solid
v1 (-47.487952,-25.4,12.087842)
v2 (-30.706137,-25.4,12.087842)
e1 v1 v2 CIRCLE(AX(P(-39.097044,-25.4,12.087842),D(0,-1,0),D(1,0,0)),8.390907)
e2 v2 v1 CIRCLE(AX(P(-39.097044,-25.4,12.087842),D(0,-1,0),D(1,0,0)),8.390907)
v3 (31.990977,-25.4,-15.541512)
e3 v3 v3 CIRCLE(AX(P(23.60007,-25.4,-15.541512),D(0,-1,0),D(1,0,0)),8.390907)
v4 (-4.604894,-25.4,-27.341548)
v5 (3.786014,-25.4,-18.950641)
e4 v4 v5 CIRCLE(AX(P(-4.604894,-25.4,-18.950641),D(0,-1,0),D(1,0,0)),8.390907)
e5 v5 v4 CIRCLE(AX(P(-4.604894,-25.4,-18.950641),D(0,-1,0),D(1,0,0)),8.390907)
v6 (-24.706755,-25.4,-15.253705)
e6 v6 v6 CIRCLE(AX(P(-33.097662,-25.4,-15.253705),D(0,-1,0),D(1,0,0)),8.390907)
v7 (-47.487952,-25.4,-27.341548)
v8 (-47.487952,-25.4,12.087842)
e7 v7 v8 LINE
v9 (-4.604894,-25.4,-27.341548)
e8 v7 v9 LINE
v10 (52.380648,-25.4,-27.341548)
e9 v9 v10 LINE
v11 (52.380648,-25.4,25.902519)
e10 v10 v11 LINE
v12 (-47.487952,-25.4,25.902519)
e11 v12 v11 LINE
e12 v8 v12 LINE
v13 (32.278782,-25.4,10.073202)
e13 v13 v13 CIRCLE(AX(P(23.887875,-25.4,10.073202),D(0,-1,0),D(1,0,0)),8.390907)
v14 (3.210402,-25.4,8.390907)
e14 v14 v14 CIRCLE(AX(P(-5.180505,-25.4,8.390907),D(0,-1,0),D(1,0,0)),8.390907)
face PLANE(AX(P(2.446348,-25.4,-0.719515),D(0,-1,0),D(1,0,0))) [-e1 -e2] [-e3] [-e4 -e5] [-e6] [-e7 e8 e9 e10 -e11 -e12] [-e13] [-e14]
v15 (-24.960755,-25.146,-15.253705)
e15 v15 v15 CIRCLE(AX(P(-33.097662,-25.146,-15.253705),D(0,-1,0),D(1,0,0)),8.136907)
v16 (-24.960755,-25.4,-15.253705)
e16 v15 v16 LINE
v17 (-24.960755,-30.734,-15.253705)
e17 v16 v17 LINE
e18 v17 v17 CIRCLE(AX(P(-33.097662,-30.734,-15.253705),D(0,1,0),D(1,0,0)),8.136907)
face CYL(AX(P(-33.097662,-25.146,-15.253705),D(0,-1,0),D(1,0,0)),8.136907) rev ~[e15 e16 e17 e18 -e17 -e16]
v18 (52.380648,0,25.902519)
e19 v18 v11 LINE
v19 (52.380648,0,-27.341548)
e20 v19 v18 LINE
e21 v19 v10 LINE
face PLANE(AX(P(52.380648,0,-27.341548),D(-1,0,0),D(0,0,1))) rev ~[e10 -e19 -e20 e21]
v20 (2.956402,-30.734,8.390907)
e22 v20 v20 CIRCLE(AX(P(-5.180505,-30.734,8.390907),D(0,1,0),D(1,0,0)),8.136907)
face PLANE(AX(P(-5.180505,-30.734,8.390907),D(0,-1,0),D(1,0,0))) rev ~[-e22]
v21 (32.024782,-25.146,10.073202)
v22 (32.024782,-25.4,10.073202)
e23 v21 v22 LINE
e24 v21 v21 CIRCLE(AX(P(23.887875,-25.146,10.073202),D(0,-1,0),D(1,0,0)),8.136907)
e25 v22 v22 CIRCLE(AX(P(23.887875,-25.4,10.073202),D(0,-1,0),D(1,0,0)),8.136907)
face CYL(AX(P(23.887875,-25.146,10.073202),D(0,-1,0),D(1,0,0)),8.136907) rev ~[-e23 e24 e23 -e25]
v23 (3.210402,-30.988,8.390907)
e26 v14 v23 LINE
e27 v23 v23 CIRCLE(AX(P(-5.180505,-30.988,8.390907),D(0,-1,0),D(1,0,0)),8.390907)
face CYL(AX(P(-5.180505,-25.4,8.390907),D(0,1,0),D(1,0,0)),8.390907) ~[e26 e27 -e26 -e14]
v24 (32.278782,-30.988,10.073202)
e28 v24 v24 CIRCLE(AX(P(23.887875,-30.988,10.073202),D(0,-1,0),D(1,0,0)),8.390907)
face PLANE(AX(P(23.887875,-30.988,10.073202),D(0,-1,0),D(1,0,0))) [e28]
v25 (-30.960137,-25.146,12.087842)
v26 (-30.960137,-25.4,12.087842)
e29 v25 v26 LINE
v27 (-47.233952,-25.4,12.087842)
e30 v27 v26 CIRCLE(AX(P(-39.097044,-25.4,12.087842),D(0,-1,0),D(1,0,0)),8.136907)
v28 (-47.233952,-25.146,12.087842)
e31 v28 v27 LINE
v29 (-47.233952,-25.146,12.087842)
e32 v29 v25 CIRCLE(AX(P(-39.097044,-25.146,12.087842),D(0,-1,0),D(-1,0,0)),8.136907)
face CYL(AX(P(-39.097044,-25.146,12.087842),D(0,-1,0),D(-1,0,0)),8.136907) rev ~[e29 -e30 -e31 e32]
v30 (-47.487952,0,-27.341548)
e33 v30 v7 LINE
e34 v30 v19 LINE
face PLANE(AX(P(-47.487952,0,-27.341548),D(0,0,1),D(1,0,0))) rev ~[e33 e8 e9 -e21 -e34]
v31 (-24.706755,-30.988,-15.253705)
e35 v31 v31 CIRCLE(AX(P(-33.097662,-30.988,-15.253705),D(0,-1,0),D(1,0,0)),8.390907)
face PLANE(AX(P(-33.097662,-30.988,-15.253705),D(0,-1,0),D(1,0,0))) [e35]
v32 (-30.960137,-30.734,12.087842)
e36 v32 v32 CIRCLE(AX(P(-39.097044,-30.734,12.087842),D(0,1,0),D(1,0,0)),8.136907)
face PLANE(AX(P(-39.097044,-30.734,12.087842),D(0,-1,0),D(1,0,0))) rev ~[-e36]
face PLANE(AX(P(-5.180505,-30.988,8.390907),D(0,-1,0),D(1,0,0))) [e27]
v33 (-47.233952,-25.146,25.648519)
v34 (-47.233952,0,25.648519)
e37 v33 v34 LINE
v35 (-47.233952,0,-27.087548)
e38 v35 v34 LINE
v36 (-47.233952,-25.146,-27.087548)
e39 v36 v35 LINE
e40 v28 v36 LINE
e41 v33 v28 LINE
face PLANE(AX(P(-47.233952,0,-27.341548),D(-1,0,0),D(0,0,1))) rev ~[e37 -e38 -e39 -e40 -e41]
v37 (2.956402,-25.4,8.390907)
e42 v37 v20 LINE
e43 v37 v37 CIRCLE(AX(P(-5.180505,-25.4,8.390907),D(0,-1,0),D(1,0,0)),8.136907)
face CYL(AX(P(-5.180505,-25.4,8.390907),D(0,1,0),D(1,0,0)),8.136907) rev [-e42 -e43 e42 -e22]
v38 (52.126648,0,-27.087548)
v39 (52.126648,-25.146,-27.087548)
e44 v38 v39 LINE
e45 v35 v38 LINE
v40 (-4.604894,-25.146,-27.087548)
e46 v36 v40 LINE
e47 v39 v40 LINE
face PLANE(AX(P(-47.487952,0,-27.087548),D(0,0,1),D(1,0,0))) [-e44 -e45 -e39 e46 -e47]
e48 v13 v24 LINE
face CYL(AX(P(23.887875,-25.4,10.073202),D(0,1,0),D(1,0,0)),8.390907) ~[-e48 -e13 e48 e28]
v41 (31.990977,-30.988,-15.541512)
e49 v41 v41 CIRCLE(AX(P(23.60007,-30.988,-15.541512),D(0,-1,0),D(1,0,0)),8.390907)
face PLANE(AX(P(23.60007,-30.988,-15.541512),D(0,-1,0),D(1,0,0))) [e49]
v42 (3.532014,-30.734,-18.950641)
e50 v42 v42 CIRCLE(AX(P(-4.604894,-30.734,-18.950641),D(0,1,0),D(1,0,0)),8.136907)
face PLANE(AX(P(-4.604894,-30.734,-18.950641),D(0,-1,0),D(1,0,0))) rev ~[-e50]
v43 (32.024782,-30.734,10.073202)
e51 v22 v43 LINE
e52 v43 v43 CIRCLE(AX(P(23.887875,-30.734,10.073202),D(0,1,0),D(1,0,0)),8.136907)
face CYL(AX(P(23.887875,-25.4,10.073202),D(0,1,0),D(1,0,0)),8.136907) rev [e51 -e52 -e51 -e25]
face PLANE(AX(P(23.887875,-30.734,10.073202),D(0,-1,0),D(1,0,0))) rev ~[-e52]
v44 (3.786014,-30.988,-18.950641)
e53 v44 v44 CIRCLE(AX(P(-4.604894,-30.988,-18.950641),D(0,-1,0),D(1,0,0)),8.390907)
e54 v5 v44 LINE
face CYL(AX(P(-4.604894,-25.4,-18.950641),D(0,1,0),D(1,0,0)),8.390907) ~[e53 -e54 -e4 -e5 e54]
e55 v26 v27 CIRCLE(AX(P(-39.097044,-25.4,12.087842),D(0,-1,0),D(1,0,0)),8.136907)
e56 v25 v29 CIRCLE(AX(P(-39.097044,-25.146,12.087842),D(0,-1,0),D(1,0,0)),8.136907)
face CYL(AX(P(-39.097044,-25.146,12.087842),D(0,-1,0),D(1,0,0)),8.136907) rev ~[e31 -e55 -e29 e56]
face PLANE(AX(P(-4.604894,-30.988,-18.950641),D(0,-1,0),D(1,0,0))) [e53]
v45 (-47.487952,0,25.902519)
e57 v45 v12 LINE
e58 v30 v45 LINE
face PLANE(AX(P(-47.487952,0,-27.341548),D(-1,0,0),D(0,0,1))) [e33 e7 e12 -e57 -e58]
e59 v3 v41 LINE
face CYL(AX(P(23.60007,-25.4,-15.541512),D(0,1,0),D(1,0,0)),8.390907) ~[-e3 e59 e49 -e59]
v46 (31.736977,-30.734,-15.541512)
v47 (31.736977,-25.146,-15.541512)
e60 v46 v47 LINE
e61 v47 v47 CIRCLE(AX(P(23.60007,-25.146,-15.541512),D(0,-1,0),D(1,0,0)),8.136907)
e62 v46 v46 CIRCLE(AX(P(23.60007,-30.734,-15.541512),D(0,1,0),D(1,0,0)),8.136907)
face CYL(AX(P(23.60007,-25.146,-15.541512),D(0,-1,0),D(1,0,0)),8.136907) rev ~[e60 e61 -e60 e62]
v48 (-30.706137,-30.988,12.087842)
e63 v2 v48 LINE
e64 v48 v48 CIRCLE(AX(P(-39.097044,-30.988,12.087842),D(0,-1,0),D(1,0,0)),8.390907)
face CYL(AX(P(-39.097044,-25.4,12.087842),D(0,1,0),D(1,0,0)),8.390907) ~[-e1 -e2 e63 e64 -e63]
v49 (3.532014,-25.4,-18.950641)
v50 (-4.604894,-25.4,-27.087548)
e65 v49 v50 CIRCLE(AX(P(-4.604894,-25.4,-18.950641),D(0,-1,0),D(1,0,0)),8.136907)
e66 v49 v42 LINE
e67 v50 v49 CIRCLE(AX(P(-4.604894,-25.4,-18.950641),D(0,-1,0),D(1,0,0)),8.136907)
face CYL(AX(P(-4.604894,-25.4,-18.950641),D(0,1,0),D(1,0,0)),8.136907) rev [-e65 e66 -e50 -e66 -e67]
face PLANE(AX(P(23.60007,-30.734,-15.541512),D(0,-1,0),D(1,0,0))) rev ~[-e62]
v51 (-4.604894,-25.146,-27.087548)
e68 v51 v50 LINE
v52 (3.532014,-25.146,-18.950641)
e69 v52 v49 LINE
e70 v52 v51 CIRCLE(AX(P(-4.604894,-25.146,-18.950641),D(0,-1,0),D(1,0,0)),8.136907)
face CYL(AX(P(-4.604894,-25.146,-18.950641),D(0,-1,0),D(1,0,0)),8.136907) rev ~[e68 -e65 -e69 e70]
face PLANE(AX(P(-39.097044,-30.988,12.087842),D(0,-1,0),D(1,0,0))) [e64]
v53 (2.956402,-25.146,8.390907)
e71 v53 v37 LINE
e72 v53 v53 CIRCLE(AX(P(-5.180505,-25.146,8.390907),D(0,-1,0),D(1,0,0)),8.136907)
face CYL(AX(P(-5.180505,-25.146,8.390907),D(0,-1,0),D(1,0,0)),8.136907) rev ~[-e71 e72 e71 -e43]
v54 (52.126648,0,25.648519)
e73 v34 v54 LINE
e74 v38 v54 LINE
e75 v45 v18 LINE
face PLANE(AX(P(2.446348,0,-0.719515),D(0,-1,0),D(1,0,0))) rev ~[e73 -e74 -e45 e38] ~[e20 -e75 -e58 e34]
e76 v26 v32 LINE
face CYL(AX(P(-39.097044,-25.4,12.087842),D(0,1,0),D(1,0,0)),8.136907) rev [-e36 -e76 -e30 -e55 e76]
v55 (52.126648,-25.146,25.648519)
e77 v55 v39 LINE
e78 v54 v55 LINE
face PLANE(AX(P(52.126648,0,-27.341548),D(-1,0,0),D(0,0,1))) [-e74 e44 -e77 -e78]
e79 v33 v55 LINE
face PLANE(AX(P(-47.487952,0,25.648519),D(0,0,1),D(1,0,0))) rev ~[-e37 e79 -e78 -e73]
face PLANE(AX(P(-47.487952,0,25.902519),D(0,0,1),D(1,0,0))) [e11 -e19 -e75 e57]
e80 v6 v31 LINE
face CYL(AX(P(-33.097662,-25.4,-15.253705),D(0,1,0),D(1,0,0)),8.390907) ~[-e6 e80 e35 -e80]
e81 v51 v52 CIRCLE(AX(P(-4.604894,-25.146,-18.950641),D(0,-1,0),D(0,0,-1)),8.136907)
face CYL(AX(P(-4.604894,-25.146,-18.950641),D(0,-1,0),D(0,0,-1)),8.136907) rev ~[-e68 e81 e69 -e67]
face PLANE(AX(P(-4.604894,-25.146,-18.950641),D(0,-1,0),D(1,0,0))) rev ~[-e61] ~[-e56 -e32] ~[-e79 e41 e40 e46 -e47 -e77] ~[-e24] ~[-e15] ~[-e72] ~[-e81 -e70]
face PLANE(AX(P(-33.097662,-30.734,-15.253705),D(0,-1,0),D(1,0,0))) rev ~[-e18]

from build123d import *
from build123d import SkipClean  # not in build123d's __all__

# Parameters (mm, degrees)
F0_W         = 99.8685993254
F0_H         = 53.244067356
F1_DEPTH     = 25.4
F2_R         = 8.3909074383
F3_DEPTH     = 5.588
F4_T         = 0.254
F4_T6_ANGLE  = 90.000000253
F4_T8_ANGLE  = 269.999999749
F4_T12_ANGLE = 180.000000001
F4_T14_ANGLE = 180.000000001


# Not quite as in the source:
# - a shell that OpenCascade refuses in one call is made with other operations: the cavity is built on its own and cut out


with BuildPart() as f1:
    # F0 (on Front) → F1 (new body)
    with BuildSketch(Plane.XZ):
        with Locations((2.4463478476, -0.7195146754)):
            Rectangle(F0_W, F0_H)
    extrude(amount=F1_DEPTH)

    # F2 (on face) → F3 (join)
    with BuildSketch(Plane.XZ.offset(25.4)):
        with Locations((-5.1805051044, 8.3909074383)):
            Circle(F2_R)
        with Locations((23.8878745586, 10.0732017308)):
            Circle(F2_R)
        with Locations((23.600069806, -15.5415115878)):
            Circle(F2_R)
        with Locations((-4.6048937365, -18.9506409151)):
            Circle(F2_R)
        with Locations((-33.0976620317, -15.2537049726)):
            Circle(F2_R)
        with Locations((-39.0970443768, 12.0878415182)):
            Circle(F2_R)
    extrude(amount=F3_DEPTH)

    # F4: shell of thickness 0.254, made by hand


with BuildPart() as f4_core1:
    # F4_t2: copy of F1
    add(f1.part, clean=False)

    # the walls: a layer under each face that stays
    f4_faces = [f4_core1.faces().sort_by_distance(p)[0] for p in [
        (-47.4879518151, -12.7, -0.7195146754),
        (2.4463478476, -12.7, 25.9025190026),
        (2.4463478476, -12.7, -27.3415483534),
        (2.4463478476, -25.4, -0.7195146754),
        (52.3806475103, -12.7, -0.7195146754),
        (-41.48856947, -28.194, -15.2537049726),
        (-12.9958011749, -28.194, -18.9506409151),
        (15.2091623677, -28.194, -15.5415115878),
        (-47.4879518151, -28.194, 12.0878415182),
        (-13.5714125427, -28.194, 8.3909074383),
        (15.4969671202, -28.194, 10.0732017308),
        (-33.0976620317, -30.988, -15.2537049726),
        (-4.6048937365, -30.988, -18.9506409151),
        (23.600069806, -30.988, -15.5415115878),
        (-39.0970443768, -30.988, 12.0878415182),
        (-5.1805051044, -30.988, 8.3909074383),
        (23.8878745586, -30.988, 10.0732017308),
    ]]
    thicken(f4_faces, amount=-F4_T, mode=Mode.SUBTRACT)

    # F4_s3 → F4_t4 (revolve, cut)
    with BuildSketch(Plane.XY.offset(-15.2537049726)):
        Polygon((-24.7042145933, -25.40254), (-24.7067545933, -25.146), (-24.9607545933, -25.146), (-24.9607545933, -25.4), align=None)
    revolve(axis=Axis((-33.0976620317, -25.4, -15.2537049726), (0, -1, 0)), mode=Mode.SUBTRACT)

    # F4_s5 → F4_t6 (revolve, cut)
    with BuildSketch(Plane.YZ.offset(-4.6048937365)):
        Polygon((-25.40254, -27.3440883534), (-25.146, -27.3415483534), (-25.146, -27.0875483534), (-25.4, -27.0875483534), align=None)
    revolve(axis=Axis((-4.6048937365, -25.4, -18.9506409151), (0, -1, 0)), revolution_arc=F4_T6_ANGLE, mode=Mode.SUBTRACT)

    # F4_s7 → F4_t8 (revolve, cut)
    with BuildSketch(Plane.XY.offset(-18.9506409151)):
        Polygon((3.7885537018, -25.40254), (3.7860137018, -25.146), (3.5320137018, -25.146), (3.5320137018, -25.4), align=None)
    revolve(axis=Axis((-4.6048937365, -25.4, -18.9506409151), (0, -1, 0)), revolution_arc=F4_T8_ANGLE, mode=Mode.SUBTRACT)

    # F4_s9 → F4_t10 (revolve, cut)
    with BuildSketch(Plane.XY.offset(-15.5415115878)):
        Polygon((31.9935172443, -25.40254), (31.9909772443, -25.146), (31.7369772443, -25.146), (31.7369772443, -25.4), align=None)
    revolve(axis=Axis((23.600069806, -25.4, -15.5415115878), (0, -1, 0)), mode=Mode.SUBTRACT)

    # F4_s11 → F4_t12 (revolve, cut)
    with BuildSketch(Plane.XY.offset(12.0878415182)):
        Polygon((-47.4904918151, -25.40254), (-47.4879518151, -25.146), (-47.2339518151, -25.146), (-47.2339518151, -25.4), align=None)
    with SkipClean():  # cleaning this boolean's faces spoils the solid; the shape is the same uncleaned
        revolve(axis=Axis((-39.0970443768, -25.4, 12.0878415182), (0, -1, 0)), revolution_arc=F4_T12_ANGLE, mode=Mode.SUBTRACT)

    # F4_s13 → F4_t14 (revolve, cut)
    with BuildSketch(Plane.XY.offset(12.0878415182)):
        Polygon((-30.7035969385, -25.40254), (-30.7061369385, -25.146), (-30.9601369385, -25.146), (-30.9601369385, -25.4), align=None)
    revolve(axis=Axis((-39.0970443768, -25.4, 12.0878415182), (0, -1, 0)), revolution_arc=F4_T14_ANGLE, mode=Mode.SUBTRACT)

    # F4_s15 → F4_t16 (revolve, cut)
    with BuildSketch(Plane.XY.offset(8.3909074383)):
        Polygon((3.212942334, -25.40254), (3.210402334, -25.146), (2.956402334, -25.146), (2.956402334, -25.4), align=None)
    revolve(axis=Axis((-5.1805051044, -25.4, 8.3909074383), (0, -1, 0)), mode=Mode.SUBTRACT)

    # F4_s17 → F4_t18 (revolve, cut)
    with BuildSketch(Plane.XY.offset(10.0732017308)):
        Polygon((32.2813219969, -25.40254), (32.2787819969, -25.146), (32.0247819969, -25.146), (32.0247819969, -25.4), align=None)
    revolve(axis=Axis((23.8878745586, -25.4, 10.0732017308), (0, -1, 0)), mode=Mode.SUBTRACT)


with BuildPart() as f1_1:
    add(f1.part, clean=False)

    # what is left inside the walls is the cavity
    f4_cavity = [f4_core1.part.solids().sort_by_distance(p)[0] for p in [
        (2.446348, -0.00254, -9.508859),
    ]]
    add(f4_cavity, mode=Mode.SUBTRACT)


solid = f1_1.part
